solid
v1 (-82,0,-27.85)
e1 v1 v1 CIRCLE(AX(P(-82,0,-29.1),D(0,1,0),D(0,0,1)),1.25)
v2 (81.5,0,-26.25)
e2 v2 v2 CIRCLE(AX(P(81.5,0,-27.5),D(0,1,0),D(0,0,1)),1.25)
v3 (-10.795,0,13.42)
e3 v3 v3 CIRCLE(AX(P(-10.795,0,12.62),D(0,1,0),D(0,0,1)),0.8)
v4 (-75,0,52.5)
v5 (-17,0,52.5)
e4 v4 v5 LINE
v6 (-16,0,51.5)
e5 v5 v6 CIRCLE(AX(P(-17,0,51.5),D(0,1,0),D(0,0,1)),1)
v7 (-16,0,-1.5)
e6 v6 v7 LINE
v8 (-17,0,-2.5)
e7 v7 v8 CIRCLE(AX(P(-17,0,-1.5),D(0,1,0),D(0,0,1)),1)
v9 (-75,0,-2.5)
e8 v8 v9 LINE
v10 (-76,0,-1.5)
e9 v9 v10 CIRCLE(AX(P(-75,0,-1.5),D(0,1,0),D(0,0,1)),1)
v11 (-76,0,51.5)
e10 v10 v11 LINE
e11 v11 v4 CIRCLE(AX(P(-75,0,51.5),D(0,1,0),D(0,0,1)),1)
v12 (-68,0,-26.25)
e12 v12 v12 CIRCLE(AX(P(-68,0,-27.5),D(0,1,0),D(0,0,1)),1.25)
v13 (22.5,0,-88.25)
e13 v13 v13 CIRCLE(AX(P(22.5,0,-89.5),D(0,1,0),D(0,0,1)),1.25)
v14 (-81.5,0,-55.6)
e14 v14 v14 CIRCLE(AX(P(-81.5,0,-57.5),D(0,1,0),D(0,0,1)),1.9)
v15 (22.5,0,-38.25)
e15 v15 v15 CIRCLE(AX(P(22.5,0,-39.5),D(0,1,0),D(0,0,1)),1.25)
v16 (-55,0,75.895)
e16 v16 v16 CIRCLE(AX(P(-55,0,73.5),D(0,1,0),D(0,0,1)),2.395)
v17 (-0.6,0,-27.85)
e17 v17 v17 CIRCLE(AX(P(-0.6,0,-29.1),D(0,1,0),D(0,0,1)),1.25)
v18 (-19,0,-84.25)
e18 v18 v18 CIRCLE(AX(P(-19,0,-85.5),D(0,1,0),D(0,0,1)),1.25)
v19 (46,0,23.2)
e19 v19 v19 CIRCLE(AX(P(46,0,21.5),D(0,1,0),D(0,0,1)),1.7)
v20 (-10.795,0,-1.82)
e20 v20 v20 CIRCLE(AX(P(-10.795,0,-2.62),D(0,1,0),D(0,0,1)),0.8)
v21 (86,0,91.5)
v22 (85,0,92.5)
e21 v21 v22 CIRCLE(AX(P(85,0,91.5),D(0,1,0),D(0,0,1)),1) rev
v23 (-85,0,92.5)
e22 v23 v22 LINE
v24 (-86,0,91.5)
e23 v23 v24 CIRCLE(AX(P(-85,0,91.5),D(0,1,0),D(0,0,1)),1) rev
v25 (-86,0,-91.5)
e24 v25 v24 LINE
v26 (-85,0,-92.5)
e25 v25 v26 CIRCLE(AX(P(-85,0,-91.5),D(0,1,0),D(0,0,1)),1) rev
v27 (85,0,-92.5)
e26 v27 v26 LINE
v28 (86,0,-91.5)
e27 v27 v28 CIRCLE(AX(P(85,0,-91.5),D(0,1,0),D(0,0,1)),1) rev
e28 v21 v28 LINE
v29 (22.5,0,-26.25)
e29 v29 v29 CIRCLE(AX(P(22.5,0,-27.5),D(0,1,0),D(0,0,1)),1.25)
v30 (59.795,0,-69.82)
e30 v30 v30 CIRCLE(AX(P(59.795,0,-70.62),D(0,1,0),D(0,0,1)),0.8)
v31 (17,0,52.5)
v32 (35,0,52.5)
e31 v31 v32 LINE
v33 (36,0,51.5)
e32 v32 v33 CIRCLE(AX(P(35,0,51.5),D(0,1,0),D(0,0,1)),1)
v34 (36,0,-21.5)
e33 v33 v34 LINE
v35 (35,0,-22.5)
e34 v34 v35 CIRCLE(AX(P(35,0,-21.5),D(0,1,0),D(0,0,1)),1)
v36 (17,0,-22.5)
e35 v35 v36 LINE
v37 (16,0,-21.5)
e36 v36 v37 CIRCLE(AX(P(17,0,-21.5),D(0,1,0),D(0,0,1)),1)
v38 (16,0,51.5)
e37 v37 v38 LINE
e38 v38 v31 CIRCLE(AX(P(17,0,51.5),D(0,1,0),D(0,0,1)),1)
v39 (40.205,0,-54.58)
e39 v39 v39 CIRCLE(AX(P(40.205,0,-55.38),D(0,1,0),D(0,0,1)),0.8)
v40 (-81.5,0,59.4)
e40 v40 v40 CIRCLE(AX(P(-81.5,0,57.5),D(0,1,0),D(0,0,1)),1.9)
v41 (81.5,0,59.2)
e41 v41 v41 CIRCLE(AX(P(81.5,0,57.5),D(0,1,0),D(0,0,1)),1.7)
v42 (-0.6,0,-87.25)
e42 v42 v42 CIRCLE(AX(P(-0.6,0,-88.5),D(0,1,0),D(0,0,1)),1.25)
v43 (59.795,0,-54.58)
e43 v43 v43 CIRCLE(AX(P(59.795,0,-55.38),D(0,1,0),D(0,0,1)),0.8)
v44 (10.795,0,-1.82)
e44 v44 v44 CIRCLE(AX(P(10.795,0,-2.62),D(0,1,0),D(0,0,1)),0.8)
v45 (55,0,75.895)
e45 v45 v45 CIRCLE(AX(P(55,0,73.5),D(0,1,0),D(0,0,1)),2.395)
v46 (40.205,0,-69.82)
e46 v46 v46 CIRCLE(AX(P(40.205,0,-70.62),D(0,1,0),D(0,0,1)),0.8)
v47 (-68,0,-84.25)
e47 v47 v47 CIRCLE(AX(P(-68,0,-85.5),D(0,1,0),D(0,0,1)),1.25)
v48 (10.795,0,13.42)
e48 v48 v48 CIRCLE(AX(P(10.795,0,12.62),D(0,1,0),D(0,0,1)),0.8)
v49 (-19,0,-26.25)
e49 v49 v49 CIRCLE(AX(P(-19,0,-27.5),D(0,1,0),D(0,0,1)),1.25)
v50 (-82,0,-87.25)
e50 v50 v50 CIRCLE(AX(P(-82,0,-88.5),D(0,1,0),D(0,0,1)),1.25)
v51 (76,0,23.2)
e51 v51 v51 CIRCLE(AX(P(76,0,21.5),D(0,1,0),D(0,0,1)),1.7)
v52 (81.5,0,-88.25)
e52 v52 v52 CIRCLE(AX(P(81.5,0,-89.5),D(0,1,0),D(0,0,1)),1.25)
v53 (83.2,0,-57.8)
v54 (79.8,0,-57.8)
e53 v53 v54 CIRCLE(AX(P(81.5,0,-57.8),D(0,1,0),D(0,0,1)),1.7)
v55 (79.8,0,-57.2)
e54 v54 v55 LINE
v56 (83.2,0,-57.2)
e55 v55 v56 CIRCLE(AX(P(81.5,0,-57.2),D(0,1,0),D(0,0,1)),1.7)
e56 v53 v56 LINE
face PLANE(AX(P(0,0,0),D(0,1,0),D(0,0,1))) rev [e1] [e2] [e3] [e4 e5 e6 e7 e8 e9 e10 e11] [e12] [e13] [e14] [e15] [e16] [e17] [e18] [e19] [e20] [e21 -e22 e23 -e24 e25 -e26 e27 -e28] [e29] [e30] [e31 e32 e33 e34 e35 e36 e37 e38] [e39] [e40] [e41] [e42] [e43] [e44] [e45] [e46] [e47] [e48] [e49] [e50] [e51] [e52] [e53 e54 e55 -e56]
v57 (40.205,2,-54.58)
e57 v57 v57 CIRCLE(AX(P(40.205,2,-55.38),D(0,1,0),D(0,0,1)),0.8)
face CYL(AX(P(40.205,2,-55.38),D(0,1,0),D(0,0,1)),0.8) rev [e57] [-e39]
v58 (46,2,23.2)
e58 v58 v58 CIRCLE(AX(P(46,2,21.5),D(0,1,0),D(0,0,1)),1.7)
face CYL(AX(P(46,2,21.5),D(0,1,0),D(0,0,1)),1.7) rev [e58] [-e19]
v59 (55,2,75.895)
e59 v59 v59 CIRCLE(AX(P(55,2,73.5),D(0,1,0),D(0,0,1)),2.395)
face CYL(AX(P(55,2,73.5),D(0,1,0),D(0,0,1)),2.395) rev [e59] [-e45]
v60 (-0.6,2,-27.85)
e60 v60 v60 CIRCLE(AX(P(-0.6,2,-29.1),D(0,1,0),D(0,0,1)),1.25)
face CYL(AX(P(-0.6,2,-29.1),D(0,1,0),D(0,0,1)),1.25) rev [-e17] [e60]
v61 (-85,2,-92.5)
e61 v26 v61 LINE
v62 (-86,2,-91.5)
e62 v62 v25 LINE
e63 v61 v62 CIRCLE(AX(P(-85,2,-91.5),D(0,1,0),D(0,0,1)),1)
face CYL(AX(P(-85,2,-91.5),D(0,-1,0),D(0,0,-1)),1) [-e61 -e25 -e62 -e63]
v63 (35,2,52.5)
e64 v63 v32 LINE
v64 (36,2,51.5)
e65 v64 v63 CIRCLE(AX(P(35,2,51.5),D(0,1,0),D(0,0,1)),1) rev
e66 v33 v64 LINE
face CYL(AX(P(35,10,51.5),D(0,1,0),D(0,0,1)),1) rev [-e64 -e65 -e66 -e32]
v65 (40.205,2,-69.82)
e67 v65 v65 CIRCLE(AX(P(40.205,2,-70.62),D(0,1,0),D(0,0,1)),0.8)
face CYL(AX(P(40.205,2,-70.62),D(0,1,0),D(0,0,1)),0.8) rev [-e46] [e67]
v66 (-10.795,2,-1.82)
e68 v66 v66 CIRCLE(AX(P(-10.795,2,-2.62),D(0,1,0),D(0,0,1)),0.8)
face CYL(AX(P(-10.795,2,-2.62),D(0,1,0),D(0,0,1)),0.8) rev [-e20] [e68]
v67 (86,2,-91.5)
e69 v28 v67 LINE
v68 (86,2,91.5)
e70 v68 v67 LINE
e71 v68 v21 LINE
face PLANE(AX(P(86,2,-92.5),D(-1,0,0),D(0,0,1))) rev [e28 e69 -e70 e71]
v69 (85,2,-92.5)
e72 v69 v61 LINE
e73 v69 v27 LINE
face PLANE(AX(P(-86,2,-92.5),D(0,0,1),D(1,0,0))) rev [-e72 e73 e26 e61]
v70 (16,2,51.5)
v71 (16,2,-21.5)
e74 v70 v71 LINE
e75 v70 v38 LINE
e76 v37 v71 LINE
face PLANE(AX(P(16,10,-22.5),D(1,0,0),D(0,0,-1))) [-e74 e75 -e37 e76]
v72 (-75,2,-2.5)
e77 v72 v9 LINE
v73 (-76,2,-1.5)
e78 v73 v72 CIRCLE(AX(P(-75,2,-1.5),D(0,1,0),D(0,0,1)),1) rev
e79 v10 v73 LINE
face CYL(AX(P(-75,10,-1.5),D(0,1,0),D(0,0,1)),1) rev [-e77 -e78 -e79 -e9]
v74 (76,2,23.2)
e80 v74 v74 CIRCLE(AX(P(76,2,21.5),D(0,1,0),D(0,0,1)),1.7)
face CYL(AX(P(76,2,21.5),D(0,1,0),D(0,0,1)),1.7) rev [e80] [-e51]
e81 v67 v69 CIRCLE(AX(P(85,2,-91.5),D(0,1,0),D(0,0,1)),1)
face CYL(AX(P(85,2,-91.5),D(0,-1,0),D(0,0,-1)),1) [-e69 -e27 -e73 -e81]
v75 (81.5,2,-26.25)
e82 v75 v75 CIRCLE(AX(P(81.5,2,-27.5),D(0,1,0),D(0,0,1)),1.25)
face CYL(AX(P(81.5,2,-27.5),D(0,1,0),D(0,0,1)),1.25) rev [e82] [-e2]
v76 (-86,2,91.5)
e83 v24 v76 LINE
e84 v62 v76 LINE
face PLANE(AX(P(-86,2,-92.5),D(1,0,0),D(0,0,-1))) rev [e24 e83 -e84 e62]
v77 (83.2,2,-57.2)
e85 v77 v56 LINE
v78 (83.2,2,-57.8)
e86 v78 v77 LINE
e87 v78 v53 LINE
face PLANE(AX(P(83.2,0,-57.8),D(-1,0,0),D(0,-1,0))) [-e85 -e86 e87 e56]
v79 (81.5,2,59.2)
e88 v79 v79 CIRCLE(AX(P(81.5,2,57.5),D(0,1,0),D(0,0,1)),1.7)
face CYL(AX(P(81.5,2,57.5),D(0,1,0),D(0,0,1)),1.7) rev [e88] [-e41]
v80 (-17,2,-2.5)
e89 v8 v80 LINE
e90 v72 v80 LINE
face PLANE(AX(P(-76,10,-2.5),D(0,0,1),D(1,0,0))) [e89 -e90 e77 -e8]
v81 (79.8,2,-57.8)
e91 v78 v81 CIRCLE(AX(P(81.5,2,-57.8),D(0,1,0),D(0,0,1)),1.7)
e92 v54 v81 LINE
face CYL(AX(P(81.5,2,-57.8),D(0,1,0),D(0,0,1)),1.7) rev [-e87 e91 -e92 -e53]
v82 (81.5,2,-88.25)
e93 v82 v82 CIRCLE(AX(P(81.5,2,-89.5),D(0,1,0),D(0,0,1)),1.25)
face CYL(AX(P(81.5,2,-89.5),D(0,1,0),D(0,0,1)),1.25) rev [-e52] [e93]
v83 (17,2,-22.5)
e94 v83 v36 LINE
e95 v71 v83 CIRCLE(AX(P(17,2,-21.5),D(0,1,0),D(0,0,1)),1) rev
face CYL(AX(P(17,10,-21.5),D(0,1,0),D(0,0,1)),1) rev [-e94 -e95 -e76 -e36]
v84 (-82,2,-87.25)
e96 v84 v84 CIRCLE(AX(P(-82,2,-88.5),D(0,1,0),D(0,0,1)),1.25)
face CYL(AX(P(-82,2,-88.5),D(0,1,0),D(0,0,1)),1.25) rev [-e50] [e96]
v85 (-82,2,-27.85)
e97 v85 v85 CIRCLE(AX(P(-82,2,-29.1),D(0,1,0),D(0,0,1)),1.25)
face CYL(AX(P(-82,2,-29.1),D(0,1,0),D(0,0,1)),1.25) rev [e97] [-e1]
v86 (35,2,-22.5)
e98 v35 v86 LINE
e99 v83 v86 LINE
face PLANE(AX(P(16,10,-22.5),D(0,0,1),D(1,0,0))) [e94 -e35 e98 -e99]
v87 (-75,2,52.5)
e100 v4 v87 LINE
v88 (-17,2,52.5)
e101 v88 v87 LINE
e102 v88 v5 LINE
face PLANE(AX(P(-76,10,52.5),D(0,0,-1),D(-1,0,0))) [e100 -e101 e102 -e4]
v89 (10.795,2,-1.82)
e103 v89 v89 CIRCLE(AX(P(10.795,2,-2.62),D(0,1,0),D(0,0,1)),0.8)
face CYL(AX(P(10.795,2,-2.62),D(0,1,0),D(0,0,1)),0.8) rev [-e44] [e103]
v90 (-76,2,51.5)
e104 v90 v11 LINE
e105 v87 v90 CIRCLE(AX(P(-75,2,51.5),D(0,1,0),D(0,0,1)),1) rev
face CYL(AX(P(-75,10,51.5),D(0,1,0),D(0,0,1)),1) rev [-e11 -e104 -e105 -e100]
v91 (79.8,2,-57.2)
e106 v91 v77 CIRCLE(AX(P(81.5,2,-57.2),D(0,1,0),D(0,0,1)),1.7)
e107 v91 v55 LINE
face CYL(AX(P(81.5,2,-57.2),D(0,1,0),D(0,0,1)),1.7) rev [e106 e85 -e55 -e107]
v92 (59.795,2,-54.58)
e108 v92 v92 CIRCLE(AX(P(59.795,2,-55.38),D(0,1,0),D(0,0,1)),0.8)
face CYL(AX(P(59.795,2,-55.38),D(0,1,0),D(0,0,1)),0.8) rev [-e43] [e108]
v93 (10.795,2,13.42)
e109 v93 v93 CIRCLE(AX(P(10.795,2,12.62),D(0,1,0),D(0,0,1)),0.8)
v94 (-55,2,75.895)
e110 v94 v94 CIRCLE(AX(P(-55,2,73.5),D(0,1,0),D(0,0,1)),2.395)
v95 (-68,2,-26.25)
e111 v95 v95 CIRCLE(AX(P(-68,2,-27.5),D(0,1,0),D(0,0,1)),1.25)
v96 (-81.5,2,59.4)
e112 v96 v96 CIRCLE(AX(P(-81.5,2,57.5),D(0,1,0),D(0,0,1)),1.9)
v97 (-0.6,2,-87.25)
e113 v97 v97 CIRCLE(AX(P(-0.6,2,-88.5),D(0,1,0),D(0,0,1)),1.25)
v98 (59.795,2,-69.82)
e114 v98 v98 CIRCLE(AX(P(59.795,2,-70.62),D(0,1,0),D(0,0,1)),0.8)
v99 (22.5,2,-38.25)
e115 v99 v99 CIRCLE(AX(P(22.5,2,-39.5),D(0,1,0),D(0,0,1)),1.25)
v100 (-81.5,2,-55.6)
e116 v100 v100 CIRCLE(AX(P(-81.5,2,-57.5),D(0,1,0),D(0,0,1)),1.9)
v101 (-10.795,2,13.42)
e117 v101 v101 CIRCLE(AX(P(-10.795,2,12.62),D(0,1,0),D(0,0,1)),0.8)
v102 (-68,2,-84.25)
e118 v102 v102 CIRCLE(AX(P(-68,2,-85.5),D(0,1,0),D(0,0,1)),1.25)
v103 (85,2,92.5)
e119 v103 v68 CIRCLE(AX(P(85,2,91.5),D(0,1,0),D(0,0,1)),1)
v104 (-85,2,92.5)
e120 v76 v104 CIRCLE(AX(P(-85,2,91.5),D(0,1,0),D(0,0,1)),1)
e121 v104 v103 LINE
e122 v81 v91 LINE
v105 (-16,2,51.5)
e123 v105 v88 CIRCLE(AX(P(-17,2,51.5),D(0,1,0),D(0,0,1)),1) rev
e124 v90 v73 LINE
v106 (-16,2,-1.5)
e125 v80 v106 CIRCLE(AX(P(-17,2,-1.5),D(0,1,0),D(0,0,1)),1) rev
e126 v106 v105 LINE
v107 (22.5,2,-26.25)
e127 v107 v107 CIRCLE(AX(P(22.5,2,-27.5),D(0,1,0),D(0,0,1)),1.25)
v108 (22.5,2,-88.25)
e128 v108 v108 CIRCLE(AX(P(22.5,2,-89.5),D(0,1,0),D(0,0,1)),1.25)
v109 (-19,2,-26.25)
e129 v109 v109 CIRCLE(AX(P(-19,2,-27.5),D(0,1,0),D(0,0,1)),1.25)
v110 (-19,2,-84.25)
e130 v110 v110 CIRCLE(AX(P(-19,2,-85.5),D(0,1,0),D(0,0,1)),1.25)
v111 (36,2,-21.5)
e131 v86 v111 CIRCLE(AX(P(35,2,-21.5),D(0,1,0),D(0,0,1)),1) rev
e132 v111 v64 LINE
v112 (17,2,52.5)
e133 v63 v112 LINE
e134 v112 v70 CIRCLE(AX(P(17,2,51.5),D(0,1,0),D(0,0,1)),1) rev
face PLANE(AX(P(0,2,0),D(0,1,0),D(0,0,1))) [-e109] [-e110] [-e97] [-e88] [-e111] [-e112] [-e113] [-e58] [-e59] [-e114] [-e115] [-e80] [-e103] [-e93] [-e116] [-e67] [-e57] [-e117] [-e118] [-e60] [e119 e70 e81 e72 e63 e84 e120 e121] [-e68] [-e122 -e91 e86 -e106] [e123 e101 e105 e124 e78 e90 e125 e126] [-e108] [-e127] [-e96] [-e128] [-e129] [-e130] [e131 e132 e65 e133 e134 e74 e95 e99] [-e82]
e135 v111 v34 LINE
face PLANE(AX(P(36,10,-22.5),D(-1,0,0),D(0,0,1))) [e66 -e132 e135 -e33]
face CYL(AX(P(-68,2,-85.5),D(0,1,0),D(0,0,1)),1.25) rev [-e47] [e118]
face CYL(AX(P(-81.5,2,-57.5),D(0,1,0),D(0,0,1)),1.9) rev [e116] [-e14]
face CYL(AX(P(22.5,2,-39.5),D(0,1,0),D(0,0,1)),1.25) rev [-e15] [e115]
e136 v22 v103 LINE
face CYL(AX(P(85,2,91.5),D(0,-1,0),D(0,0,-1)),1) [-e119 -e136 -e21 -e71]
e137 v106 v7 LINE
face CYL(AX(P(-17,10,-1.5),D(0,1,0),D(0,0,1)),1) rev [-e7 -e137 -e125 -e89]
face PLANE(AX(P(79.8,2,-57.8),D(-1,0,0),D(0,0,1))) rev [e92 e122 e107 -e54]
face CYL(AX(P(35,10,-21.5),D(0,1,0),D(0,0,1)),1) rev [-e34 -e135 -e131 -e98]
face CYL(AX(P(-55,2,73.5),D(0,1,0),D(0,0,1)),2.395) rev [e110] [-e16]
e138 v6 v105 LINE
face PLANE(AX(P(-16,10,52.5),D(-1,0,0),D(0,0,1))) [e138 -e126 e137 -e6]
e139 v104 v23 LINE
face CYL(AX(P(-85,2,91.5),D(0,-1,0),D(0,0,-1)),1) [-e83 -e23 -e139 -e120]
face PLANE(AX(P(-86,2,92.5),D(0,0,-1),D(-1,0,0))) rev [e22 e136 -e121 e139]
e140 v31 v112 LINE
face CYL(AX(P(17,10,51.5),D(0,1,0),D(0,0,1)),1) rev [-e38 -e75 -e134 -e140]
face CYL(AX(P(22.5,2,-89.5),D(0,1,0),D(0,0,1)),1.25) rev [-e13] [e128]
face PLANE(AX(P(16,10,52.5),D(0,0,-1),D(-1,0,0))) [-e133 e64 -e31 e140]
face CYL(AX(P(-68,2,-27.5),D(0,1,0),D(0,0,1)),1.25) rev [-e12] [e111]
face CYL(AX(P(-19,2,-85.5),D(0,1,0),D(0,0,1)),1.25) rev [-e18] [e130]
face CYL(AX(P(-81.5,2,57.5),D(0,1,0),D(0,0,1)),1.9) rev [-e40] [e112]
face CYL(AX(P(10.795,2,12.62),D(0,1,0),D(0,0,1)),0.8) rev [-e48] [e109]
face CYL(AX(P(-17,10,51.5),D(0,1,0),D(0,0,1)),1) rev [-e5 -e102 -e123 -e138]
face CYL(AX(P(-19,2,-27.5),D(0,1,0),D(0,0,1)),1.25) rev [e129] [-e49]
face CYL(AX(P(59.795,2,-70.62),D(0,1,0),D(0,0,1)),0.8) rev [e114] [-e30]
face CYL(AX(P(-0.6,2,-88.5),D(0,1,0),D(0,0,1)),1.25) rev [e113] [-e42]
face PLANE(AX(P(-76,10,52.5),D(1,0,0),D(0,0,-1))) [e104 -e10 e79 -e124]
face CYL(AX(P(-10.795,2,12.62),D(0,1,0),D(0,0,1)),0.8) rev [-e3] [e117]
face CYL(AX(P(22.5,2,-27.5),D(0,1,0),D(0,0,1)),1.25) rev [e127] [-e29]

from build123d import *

# Parameters (mm, degrees)
SKIZZE1_W                             = 172
SKIZZE1_H                             = 185
AUFSATZ_LINEAR_AUSTRAGEN1_DEPTH       = 2
DURCHGANGSLOCH_F_R_M31_D              = 3.4
F_3_8_3_8_DURCHMESSER_BOHRUNG1_D      = 3.8
F_3_8_3_8_DURCHMESSER_BOHRUNG1_DEPTH  = 10
F_3_8_3_8_DURCHMESSER_BOHRUNG1_TIP    = 1.141635176
F_3_4_3_4_DURCHMESSER_LANGLOCH1_DEPTH = 2
SKIZZE5_W                             = 20
SKIZZE5_H                             = 75
SKIZZE5_W_2                           = 60
SKIZZE5_H_2                           = 55
SCHNITT_LINEAR_AUSTRAGEN1_DEPTH       = 10
F_4_3_4_79_DURCHMESSER_BOHRUNG1_D     = 4.79
DURCHGANGSLOCH_F_R_M32_D              = 3.4
M3X0_5_GEWINDEBOHRUNG2_D              = 2.5
M3X0_5_GEWINDEBOHRUNG3_D              = 2.5
VERRUNDUNG1_R                         = 1
M2X0_4_GEWINDEBOHRUNG1_D              = 1.6


# Read off the part's stored shape, not the designer's step: Ø3.4 (3.4) Durchmesser Langloch1
with BuildPart() as part:
    # Skizze1 → Aufsatz-Linear austragen1 (new body)
    with BuildSketch(Plane(origin=(0, 0, 0), x_dir=(1, 0, 0), z_dir=(0, 1, 0))):
        Rectangle(SKIZZE1_W, SKIZZE1_H)
    extrude(amount=AUFSATZ_LINEAR_AUSTRAGEN1_DEPTH)

    # Durchgangsloch für M31 (through all)
    with Locations(Plane(origin=(0, 2, 0), x_dir=(1, 0, 0), z_dir=(0, 1, 0))):
        with Locations((81.5, -57.5)):
            Hole(DURCHGANGSLOCH_F_R_M31_D / 2)

    # Ø3.8 (3.8) Durchmesser Bohrung1
    with Locations(Plane(origin=(0, 2, 0), x_dir=(1, 0, 0), z_dir=(0, 1, 0))):
        with Locations((-81.5, -57.5), (-81.5, 57.5)):
            Hole(F_3_8_3_8_DURCHMESSER_BOHRUNG1_D / 2, depth=F_3_8_3_8_DURCHMESSER_BOHRUNG1_DEPTH)
            with Locations((0, 0, -(F_3_8_3_8_DURCHMESSER_BOHRUNG1_DEPTH + F_3_8_3_8_DURCHMESSER_BOHRUNG1_TIP / 2))):  # 118° drill point
                Cone(0, F_3_8_3_8_DURCHMESSER_BOHRUNG1_D / 2, F_3_8_3_8_DURCHMESSER_BOHRUNG1_TIP, mode=Mode.SUBTRACT)

    # Ø3.4 (3.4) Durchmesser Langloch1 outline → Ø3.4 (3.4) Durchmesser Langloch1 (cut)
    with BuildSketch(Plane(origin=(0, 0, 0), x_dir=(1, 0, 0), z_dir=(0, 1, 0))):
        with BuildLine():
            Line((79.8, 57.8), (79.8, 57.2))
            ThreePointArc((79.8, 57.2), (81.5, 55.5), (83.2, 57.2))
            Line((83.2, 57.2), (83.2, 57.8))
            ThreePointArc((83.2, 57.8), (81.5, 59.5), (79.8, 57.8))
        make_face()
    extrude(amount=F_3_4_3_4_DURCHMESSER_LANGLOCH1_DEPTH, mode=Mode.SUBTRACT)

    # Skizze5 → Schnitt-Linear austragen1 (cut)
    with BuildSketch(Plane(origin=(0, 0, 0), x_dir=(1, 0, 0), z_dir=(0, 1, 0))):
        with Locations((26, -15)):
            Rectangle(SKIZZE5_W, SKIZZE5_H)
        with Locations((-46, -25)):
            Rectangle(SKIZZE5_W_2, SKIZZE5_H_2)
    extrude(amount=SCHNITT_LINEAR_AUSTRAGEN1_DEPTH, mode=Mode.SUBTRACT)

    # Ø4.3 (4.79) Durchmesser Bohrung1 (through all)
    with Locations(Plane(origin=(0, 2, 0), x_dir=(1, 0, 0), z_dir=(0, 1, 0))):
        with Locations((-55, -73.5), (55, -73.5)):
            Hole(F_4_3_4_79_DURCHMESSER_BOHRUNG1_D / 2)

    # Durchgangsloch für M32 (through all)
    with Locations(Plane(origin=(0, 2, 0), x_dir=(1, 0, 0), z_dir=(0, 1, 0))):
        with Locations((46, -21.5), (76, -21.5)):
            Hole(DURCHGANGSLOCH_F_R_M32_D / 2)

    # M3x0.5 Gewindebohrung2 (through all)
    with Locations(Plane(origin=(0, 2, 0), x_dir=(1, 0, 0), z_dir=(0, 1, 0))):
        with Locations((-68, 27.5), (-19, 85.5), (-68, 85.5), (-19, 27.5), (-0.6, 29.1), (-82, 88.5), (-0.6, 88.5), (-82, 29.1)):
            Hole(M3X0_5_GEWINDEBOHRUNG2_D / 2)

    # M3x0.5 Gewindebohrung3 (through all)
    with Locations(Plane(origin=(0, 2, 0), x_dir=(1, 0, 0), z_dir=(0, 1, 0))):
        with Locations((22.5, 27.5), (81.5, 89.5), (22.5, 89.5), (81.5, 27.5), (22.5, 39.5)):
            Hole(M3X0_5_GEWINDEBOHRUNG3_D / 2)

    # Verrundung1
    verrundung1_edges = [part.edges().sort_by_distance(p)[0] for p in [
        (16, 1, -22.5),
        (16, 1, 52.5),
        (36, 1, 52.5),
        (36, 1, -22.5),
        (-76, 1, -2.5),
        (-76, 1, 52.5),
        (-16, 1, 52.5),
        (-16, 1, -2.5),
        (-86, 1, -92.5),
        (86, 1, -92.5),
        (86, 1, 92.5),
        (-86, 1, 92.5),
    ]]
    fillet(verrundung1_edges, radius=VERRUNDUNG1_R)

    # M2x0.4 Gewindebohrung1 (through all)
    with Locations(Plane(origin=(0, 2, 0), x_dir=(1, 0, 0), z_dir=(0, 1, 0))):
        with Locations((10.795, -12.62), (-10.795, -12.62), (-10.795, 2.62), (10.795, 2.62), (40.205, 70.62), (40.205, 55.38), (59.795, 55.38), (59.795, 70.62)):
            Hole(M2X0_4_GEWINDEBOHRUNG1_D / 2)


solid = part.part
